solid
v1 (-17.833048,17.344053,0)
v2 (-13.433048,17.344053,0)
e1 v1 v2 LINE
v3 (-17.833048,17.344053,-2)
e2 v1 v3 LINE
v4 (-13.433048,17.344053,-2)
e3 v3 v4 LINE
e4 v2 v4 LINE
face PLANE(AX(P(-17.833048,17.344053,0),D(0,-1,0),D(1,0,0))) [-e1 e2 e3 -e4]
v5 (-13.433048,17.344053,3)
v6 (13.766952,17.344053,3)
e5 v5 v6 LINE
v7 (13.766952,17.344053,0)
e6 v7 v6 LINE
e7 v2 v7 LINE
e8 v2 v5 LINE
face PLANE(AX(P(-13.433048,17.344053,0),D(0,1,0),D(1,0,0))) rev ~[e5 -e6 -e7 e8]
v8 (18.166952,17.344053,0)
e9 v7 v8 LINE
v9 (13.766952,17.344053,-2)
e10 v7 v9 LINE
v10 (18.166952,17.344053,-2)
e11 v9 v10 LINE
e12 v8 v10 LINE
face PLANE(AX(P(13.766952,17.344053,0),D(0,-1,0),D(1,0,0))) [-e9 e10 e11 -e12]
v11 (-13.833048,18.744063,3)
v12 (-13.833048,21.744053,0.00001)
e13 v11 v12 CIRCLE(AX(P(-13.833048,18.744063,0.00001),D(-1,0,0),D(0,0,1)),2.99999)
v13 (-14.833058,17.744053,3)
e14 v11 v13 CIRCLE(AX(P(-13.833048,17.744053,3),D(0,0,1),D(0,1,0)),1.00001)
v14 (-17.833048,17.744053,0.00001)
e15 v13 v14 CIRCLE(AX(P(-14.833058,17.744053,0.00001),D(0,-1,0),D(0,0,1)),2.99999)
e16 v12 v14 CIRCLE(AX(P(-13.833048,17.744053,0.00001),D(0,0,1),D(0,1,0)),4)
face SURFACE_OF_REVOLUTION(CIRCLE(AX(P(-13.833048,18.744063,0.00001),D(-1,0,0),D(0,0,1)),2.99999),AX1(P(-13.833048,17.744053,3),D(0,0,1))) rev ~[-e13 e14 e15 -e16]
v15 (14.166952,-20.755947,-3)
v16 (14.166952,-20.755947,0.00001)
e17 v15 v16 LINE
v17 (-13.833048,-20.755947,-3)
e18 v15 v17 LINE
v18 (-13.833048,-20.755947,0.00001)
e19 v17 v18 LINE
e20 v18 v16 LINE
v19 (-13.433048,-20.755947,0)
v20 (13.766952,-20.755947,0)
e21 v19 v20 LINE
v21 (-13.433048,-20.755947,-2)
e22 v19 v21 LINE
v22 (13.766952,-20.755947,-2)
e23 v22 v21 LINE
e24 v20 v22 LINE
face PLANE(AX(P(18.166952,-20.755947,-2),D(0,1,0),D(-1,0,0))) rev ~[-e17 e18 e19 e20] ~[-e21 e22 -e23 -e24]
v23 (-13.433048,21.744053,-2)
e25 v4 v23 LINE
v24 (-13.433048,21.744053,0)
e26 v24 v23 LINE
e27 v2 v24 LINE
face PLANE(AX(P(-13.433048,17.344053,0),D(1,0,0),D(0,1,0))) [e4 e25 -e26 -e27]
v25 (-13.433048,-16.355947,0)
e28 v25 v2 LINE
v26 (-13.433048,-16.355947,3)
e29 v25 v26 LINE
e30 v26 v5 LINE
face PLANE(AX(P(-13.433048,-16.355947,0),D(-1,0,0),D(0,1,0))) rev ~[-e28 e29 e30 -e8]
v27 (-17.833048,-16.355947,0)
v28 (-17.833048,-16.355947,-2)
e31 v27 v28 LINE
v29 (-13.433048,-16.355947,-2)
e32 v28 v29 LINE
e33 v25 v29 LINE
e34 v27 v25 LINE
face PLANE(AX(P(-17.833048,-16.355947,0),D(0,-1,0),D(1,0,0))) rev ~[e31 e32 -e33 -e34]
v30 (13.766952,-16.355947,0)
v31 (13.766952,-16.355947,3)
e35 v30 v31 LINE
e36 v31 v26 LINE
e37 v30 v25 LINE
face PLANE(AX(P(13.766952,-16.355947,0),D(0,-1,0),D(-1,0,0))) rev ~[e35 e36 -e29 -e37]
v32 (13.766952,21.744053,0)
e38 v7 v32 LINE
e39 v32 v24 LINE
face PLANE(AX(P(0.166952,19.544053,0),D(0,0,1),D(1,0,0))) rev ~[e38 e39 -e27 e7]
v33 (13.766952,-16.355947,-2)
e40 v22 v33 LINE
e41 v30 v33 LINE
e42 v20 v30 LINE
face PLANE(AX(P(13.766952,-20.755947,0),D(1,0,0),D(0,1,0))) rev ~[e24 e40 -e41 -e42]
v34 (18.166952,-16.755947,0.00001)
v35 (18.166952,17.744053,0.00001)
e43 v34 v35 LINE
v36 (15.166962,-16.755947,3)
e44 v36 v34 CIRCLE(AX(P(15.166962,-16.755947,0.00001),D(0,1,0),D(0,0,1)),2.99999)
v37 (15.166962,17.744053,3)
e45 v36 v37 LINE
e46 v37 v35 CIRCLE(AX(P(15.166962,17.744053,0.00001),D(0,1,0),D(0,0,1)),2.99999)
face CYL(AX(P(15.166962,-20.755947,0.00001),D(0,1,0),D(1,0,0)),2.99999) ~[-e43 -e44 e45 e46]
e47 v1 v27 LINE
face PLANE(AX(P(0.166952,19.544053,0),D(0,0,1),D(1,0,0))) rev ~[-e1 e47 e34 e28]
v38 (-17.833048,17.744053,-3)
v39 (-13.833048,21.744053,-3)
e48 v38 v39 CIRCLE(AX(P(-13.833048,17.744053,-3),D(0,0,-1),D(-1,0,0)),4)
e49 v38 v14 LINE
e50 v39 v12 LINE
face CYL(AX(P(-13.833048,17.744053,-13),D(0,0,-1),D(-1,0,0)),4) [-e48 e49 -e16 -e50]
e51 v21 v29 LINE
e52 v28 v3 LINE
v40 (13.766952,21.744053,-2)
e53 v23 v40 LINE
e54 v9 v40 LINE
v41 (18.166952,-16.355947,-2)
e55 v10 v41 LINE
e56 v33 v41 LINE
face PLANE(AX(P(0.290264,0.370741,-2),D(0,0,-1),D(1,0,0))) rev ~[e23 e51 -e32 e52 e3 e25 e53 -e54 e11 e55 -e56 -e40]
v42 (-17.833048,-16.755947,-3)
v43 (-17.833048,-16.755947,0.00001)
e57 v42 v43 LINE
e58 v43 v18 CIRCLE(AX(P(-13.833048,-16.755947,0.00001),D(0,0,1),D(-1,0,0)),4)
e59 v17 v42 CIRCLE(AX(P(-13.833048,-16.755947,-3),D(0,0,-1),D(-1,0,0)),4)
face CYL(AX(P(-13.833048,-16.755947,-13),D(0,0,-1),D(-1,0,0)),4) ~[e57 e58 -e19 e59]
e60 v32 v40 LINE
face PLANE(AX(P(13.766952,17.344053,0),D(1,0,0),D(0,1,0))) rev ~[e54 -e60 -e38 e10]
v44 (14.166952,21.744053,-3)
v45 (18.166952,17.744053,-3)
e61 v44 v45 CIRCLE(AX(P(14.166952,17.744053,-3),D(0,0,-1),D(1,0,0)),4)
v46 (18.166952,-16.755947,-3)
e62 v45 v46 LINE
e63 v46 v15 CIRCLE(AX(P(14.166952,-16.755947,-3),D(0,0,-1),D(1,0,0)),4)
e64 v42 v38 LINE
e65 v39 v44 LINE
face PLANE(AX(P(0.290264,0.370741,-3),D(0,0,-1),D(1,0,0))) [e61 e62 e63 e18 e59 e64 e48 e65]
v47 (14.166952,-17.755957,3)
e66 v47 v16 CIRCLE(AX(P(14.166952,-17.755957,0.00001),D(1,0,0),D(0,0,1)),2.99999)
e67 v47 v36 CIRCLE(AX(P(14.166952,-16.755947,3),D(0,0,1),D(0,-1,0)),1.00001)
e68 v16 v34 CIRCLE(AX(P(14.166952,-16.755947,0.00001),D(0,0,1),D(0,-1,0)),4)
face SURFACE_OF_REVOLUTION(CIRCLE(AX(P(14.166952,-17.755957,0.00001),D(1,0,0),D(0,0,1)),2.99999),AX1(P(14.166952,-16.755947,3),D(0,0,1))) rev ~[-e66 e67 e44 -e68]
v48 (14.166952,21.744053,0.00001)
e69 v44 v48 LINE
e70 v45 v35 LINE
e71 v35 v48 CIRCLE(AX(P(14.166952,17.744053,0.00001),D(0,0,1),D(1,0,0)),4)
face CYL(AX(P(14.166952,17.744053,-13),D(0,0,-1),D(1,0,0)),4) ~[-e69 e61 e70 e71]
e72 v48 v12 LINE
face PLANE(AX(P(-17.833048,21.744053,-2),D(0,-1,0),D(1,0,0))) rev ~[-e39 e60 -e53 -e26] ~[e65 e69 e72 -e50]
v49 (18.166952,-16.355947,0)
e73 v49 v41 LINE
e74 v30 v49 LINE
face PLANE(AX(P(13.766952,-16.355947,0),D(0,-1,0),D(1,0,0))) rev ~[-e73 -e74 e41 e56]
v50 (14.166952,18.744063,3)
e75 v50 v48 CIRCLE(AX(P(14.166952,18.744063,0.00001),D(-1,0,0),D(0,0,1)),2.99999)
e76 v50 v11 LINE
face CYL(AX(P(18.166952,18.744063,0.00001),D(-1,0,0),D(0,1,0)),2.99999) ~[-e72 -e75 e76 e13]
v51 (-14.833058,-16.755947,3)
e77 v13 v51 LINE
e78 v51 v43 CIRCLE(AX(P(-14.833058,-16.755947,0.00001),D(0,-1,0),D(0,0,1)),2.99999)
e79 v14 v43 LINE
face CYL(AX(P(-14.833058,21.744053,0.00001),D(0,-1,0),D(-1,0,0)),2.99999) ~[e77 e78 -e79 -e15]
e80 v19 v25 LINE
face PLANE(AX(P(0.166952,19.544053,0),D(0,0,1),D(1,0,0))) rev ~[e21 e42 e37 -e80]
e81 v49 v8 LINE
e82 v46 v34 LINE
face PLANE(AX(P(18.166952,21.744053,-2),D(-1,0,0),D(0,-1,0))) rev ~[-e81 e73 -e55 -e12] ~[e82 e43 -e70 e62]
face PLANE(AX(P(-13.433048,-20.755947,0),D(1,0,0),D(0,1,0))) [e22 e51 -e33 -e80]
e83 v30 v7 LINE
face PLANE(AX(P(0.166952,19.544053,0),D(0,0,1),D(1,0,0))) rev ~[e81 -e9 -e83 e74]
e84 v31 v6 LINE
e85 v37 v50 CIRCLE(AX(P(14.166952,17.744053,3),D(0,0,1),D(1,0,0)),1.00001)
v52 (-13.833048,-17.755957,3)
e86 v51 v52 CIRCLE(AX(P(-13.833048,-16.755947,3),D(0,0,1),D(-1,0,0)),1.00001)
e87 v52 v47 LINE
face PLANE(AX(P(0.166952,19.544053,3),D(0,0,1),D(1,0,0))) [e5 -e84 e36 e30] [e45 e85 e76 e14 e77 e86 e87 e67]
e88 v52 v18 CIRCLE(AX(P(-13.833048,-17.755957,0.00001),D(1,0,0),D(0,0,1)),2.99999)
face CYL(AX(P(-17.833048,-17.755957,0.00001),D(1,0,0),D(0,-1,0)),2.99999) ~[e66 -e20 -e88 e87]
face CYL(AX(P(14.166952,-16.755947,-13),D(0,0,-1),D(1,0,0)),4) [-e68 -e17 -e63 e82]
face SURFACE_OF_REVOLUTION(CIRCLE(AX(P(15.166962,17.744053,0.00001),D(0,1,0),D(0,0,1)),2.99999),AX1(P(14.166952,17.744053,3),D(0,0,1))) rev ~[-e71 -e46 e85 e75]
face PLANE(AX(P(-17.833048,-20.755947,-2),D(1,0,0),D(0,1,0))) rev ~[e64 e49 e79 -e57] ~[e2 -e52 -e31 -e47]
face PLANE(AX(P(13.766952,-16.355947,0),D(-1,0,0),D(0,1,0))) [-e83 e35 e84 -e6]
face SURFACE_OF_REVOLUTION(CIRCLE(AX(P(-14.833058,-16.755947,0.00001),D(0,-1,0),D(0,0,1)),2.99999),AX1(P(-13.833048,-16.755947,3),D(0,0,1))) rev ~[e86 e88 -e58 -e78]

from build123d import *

# Parameters (mm, degrees)
F0_W         = 27.2
F0_H         = 4.4
F0_W_2       = 4.4
F0_H_2       = 33.7
F1_DEPTH     = 3
F2_R         = 2.99999
F3_DEPTH     = 2
F4_W         = 4.4
F4_H         = 4.4
F5_DEPTH     = 1
F6_T1_DEPTH  = 16
F6_T4_ANGLE  = 90
F6_T6_ANGLE  = 90
F6_T8_ANGLE  = 90
F6_T10_ANGLE = 90


# Not quite as in the source:
# - a fillet or chamfer that OpenCascade refuses, or shapes differently, is made with other operations: its cross-section is extruded or revolved along the edge and cut away or added
# - a fillet or chamfer is up to 0.001 mm smaller than in the source, because OpenCascade refuses the exact size


with BuildPart() as f1:
    # F0 (on Top) → F1 (new body)
    with BuildSketch(Plane.XY):
        with Locations((0.1669520199, 19.5440534235)):
            Rectangle(F0_W, F0_H)
        with Locations((-15.6330479801, 0.4940534235)):
            Rectangle(F0_W_2, F0_H_2)
        with Locations((-15.6330479801, 19.5440534235)):
            Rectangle(F0_W_2, F0_H)
        with Locations((-15.6330479801, -18.5559465765)):
            Rectangle(F0_W_2, F0_H)
        with Locations((0.1669520199, -18.5559465765)):
            Rectangle(F0_W, F0_H)
        with Locations((15.9669520199, -18.5559465765)):
            Rectangle(F0_W_2, F0_H)
        with Locations((15.9669520199, 0.4940534235)):
            Rectangle(F0_W_2, F0_H_2)
        with Locations((15.9669520199, 19.5440534235)):
            Rectangle(F0_W_2, F0_H)
    extrude(amount=F1_DEPTH)

    # F2 (radius 3 in the source; OpenCascade refuses exactly that, so slightly less here)
    f2_edges = [f1.edges().sort_by_distance(p)[0] for p in [
        (18.166952, 0.494053, 3),
        (0.166952, 21.744053, 3),
        (-17.833048, 0.494053, 3),
        (0.166952, -20.755947, 3),
    ]]
    fillet(f2_edges, radius=F2_R)

    # F0 (on Top) → F3 (join)
    with BuildSketch(Plane.XY):
        with Locations((-15.6330479801, -18.5559465765)):
            Rectangle(F0_W_2, F0_H)
        with Locations((15.9669520199, -18.5559465765)):
            Rectangle(F0_W_2, F0_H)
        with Locations((15.9669520199, 19.5440534235)):
            Rectangle(F0_W_2, F0_H)
        with Locations((-15.6330479801, 19.5440534235)):
            Rectangle(F0_W_2, F0_H)
    extrude(amount=-F3_DEPTH)

    # F4 (on face) → F5 (join)
    with BuildSketch(Plane(origin=(0, 0, -2), x_dir=(1, 0, 0), z_dir=(0, 0, -1))):
        Polygon((-13.4330479801, -21.7440534235), (18.1669520199, -21.7440534235), (18.1669520199, 20.7559465765), (-17.8330479801, 20.7559465765), (-17.8330479801, -17.3440534235), (-13.4330479801, -17.3440534235), align=None)
        with Locations((-15.6330479801, -19.5440534235)):
            Rectangle(F4_W, F4_H)
    extrude(amount=F5_DEPTH)

    # F6: fillet of radius 4 on 4 edges, made by hand

    # F6_s2 → F6_t1 (cut)
    with BuildSketch(Plane.XY.offset(-13)):
        with BuildLine():
            ThreePointArc((18.1669520199, 17.7440534235), (16.9953791447, 20.5724805482), (14.1669520199, 21.7440534235))
            Line((14.1669520199, 21.7440534235), (18.1669520199, 21.7440534235))
            Line((18.1669520199, 21.7440534235), (18.1669520199, 17.7440534235))
        make_face()
        with BuildLine():
            ThreePointArc((18.1669520199, -16.7559465765), (16.9953791447, -19.5843737013), (14.1669520199, -20.7559465765))
            Line((14.1669520199, -20.7559465765), (18.1669520199, -20.7559465765))
            Line((18.1669520199, -20.7559465765), (18.1669520199, -16.7559465765))
        make_face()
        with BuildLine():
            ThreePointArc((-17.8330479801, -16.7559465765), (-16.6614751048, -19.5843737013), (-13.8330479801, -20.7559465765))
            Line((-13.8330479801, -20.7559465765), (-17.8330479801, -20.7559465765))
            Line((-17.8330479801, -20.7559465765), (-17.8330479801, -16.7559465765))
        make_face()
        with BuildLine():
            ThreePointArc((-17.8330479801, 17.7440534235), (-16.6614751048, 20.5724805482), (-13.8330479801, 21.7440534235))
            Line((-13.8330479801, 21.7440534235), (-17.8330479801, 21.7440534235))
            Line((-17.8330479801, 21.7440534235), (-17.8330479801, 17.7440534235))
        make_face()
    extrude(amount=F6_T1_DEPTH, mode=Mode.SUBTRACT)

    # F6_s3 → F6_t4 (revolve, cut)
    with BuildSketch(Plane.YZ.offset(-13.8330479801)):
        with BuildLine():
            ThreePointArc((18.7440634235, 3), (20.8653766959, 2.1213232725), (21.7440534235, 1e-05))
            Line((21.7440534235, 1e-05), (21.7440534235, 3))
            Line((21.7440534235, 3), (18.7440634235, 3))
        make_face()
    revolve(axis=Axis((-13.8330479801, 17.7440534235, 3), (0, 0, 1)), revolution_arc=F6_T4_ANGLE, mode=Mode.SUBTRACT)

    # F6_s5 → F6_t6 (revolve, cut)
    with BuildSketch(Plane.XZ.offset(16.7559465765)):
        with BuildLine():
            ThreePointArc((-14.8330579801, 3), (-16.9543712526, 2.1213232725), (-17.8330479801, 1e-05))
            Line((-17.8330479801, 1e-05), (-17.8330479801, 3))
            Line((-17.8330479801, 3), (-14.8330579801, 3))
        make_face()
    revolve(axis=Axis((-13.8330479801, -16.7559465765, 3), (0, 0, 1)), revolution_arc=F6_T6_ANGLE, mode=Mode.SUBTRACT)

    # F6_s7 → F6_t8 (revolve, cut)
    with BuildSketch(Plane.YZ.offset(14.1669520199)):
        with BuildLine():
            ThreePointArc((-17.7559565765, 3), (-19.877269849, 2.1213232725), (-20.7559465765, 1e-05))
            Line((-20.7559465765, 1e-05), (-20.7559465765, 3))
            Line((-20.7559465765, 3), (-17.7559565765, 3))
        make_face()
    revolve(axis=Axis((14.1669520199, -16.7559465765, 3), (0, 0, 1)), revolution_arc=F6_T8_ANGLE, mode=Mode.SUBTRACT)

    # F6_s9 → F6_t10 (revolve, cut)
    with BuildSketch(Plane.XZ.offset(-17.7440534235)):
        with BuildLine():
            ThreePointArc((15.1669620199, 3), (17.2882752924, 2.1213232725), (18.1669520199, 1e-05))
            Line((18.1669520199, 1e-05), (18.1669520199, 3))
            Line((18.1669520199, 3), (15.1669620199, 3))
        make_face()
    revolve(axis=Axis((14.1669520199, 17.7440534235, 3), (0, 0, 1)), revolution_arc=F6_T10_ANGLE, mode=Mode.SUBTRACT)


solid = f1.part
